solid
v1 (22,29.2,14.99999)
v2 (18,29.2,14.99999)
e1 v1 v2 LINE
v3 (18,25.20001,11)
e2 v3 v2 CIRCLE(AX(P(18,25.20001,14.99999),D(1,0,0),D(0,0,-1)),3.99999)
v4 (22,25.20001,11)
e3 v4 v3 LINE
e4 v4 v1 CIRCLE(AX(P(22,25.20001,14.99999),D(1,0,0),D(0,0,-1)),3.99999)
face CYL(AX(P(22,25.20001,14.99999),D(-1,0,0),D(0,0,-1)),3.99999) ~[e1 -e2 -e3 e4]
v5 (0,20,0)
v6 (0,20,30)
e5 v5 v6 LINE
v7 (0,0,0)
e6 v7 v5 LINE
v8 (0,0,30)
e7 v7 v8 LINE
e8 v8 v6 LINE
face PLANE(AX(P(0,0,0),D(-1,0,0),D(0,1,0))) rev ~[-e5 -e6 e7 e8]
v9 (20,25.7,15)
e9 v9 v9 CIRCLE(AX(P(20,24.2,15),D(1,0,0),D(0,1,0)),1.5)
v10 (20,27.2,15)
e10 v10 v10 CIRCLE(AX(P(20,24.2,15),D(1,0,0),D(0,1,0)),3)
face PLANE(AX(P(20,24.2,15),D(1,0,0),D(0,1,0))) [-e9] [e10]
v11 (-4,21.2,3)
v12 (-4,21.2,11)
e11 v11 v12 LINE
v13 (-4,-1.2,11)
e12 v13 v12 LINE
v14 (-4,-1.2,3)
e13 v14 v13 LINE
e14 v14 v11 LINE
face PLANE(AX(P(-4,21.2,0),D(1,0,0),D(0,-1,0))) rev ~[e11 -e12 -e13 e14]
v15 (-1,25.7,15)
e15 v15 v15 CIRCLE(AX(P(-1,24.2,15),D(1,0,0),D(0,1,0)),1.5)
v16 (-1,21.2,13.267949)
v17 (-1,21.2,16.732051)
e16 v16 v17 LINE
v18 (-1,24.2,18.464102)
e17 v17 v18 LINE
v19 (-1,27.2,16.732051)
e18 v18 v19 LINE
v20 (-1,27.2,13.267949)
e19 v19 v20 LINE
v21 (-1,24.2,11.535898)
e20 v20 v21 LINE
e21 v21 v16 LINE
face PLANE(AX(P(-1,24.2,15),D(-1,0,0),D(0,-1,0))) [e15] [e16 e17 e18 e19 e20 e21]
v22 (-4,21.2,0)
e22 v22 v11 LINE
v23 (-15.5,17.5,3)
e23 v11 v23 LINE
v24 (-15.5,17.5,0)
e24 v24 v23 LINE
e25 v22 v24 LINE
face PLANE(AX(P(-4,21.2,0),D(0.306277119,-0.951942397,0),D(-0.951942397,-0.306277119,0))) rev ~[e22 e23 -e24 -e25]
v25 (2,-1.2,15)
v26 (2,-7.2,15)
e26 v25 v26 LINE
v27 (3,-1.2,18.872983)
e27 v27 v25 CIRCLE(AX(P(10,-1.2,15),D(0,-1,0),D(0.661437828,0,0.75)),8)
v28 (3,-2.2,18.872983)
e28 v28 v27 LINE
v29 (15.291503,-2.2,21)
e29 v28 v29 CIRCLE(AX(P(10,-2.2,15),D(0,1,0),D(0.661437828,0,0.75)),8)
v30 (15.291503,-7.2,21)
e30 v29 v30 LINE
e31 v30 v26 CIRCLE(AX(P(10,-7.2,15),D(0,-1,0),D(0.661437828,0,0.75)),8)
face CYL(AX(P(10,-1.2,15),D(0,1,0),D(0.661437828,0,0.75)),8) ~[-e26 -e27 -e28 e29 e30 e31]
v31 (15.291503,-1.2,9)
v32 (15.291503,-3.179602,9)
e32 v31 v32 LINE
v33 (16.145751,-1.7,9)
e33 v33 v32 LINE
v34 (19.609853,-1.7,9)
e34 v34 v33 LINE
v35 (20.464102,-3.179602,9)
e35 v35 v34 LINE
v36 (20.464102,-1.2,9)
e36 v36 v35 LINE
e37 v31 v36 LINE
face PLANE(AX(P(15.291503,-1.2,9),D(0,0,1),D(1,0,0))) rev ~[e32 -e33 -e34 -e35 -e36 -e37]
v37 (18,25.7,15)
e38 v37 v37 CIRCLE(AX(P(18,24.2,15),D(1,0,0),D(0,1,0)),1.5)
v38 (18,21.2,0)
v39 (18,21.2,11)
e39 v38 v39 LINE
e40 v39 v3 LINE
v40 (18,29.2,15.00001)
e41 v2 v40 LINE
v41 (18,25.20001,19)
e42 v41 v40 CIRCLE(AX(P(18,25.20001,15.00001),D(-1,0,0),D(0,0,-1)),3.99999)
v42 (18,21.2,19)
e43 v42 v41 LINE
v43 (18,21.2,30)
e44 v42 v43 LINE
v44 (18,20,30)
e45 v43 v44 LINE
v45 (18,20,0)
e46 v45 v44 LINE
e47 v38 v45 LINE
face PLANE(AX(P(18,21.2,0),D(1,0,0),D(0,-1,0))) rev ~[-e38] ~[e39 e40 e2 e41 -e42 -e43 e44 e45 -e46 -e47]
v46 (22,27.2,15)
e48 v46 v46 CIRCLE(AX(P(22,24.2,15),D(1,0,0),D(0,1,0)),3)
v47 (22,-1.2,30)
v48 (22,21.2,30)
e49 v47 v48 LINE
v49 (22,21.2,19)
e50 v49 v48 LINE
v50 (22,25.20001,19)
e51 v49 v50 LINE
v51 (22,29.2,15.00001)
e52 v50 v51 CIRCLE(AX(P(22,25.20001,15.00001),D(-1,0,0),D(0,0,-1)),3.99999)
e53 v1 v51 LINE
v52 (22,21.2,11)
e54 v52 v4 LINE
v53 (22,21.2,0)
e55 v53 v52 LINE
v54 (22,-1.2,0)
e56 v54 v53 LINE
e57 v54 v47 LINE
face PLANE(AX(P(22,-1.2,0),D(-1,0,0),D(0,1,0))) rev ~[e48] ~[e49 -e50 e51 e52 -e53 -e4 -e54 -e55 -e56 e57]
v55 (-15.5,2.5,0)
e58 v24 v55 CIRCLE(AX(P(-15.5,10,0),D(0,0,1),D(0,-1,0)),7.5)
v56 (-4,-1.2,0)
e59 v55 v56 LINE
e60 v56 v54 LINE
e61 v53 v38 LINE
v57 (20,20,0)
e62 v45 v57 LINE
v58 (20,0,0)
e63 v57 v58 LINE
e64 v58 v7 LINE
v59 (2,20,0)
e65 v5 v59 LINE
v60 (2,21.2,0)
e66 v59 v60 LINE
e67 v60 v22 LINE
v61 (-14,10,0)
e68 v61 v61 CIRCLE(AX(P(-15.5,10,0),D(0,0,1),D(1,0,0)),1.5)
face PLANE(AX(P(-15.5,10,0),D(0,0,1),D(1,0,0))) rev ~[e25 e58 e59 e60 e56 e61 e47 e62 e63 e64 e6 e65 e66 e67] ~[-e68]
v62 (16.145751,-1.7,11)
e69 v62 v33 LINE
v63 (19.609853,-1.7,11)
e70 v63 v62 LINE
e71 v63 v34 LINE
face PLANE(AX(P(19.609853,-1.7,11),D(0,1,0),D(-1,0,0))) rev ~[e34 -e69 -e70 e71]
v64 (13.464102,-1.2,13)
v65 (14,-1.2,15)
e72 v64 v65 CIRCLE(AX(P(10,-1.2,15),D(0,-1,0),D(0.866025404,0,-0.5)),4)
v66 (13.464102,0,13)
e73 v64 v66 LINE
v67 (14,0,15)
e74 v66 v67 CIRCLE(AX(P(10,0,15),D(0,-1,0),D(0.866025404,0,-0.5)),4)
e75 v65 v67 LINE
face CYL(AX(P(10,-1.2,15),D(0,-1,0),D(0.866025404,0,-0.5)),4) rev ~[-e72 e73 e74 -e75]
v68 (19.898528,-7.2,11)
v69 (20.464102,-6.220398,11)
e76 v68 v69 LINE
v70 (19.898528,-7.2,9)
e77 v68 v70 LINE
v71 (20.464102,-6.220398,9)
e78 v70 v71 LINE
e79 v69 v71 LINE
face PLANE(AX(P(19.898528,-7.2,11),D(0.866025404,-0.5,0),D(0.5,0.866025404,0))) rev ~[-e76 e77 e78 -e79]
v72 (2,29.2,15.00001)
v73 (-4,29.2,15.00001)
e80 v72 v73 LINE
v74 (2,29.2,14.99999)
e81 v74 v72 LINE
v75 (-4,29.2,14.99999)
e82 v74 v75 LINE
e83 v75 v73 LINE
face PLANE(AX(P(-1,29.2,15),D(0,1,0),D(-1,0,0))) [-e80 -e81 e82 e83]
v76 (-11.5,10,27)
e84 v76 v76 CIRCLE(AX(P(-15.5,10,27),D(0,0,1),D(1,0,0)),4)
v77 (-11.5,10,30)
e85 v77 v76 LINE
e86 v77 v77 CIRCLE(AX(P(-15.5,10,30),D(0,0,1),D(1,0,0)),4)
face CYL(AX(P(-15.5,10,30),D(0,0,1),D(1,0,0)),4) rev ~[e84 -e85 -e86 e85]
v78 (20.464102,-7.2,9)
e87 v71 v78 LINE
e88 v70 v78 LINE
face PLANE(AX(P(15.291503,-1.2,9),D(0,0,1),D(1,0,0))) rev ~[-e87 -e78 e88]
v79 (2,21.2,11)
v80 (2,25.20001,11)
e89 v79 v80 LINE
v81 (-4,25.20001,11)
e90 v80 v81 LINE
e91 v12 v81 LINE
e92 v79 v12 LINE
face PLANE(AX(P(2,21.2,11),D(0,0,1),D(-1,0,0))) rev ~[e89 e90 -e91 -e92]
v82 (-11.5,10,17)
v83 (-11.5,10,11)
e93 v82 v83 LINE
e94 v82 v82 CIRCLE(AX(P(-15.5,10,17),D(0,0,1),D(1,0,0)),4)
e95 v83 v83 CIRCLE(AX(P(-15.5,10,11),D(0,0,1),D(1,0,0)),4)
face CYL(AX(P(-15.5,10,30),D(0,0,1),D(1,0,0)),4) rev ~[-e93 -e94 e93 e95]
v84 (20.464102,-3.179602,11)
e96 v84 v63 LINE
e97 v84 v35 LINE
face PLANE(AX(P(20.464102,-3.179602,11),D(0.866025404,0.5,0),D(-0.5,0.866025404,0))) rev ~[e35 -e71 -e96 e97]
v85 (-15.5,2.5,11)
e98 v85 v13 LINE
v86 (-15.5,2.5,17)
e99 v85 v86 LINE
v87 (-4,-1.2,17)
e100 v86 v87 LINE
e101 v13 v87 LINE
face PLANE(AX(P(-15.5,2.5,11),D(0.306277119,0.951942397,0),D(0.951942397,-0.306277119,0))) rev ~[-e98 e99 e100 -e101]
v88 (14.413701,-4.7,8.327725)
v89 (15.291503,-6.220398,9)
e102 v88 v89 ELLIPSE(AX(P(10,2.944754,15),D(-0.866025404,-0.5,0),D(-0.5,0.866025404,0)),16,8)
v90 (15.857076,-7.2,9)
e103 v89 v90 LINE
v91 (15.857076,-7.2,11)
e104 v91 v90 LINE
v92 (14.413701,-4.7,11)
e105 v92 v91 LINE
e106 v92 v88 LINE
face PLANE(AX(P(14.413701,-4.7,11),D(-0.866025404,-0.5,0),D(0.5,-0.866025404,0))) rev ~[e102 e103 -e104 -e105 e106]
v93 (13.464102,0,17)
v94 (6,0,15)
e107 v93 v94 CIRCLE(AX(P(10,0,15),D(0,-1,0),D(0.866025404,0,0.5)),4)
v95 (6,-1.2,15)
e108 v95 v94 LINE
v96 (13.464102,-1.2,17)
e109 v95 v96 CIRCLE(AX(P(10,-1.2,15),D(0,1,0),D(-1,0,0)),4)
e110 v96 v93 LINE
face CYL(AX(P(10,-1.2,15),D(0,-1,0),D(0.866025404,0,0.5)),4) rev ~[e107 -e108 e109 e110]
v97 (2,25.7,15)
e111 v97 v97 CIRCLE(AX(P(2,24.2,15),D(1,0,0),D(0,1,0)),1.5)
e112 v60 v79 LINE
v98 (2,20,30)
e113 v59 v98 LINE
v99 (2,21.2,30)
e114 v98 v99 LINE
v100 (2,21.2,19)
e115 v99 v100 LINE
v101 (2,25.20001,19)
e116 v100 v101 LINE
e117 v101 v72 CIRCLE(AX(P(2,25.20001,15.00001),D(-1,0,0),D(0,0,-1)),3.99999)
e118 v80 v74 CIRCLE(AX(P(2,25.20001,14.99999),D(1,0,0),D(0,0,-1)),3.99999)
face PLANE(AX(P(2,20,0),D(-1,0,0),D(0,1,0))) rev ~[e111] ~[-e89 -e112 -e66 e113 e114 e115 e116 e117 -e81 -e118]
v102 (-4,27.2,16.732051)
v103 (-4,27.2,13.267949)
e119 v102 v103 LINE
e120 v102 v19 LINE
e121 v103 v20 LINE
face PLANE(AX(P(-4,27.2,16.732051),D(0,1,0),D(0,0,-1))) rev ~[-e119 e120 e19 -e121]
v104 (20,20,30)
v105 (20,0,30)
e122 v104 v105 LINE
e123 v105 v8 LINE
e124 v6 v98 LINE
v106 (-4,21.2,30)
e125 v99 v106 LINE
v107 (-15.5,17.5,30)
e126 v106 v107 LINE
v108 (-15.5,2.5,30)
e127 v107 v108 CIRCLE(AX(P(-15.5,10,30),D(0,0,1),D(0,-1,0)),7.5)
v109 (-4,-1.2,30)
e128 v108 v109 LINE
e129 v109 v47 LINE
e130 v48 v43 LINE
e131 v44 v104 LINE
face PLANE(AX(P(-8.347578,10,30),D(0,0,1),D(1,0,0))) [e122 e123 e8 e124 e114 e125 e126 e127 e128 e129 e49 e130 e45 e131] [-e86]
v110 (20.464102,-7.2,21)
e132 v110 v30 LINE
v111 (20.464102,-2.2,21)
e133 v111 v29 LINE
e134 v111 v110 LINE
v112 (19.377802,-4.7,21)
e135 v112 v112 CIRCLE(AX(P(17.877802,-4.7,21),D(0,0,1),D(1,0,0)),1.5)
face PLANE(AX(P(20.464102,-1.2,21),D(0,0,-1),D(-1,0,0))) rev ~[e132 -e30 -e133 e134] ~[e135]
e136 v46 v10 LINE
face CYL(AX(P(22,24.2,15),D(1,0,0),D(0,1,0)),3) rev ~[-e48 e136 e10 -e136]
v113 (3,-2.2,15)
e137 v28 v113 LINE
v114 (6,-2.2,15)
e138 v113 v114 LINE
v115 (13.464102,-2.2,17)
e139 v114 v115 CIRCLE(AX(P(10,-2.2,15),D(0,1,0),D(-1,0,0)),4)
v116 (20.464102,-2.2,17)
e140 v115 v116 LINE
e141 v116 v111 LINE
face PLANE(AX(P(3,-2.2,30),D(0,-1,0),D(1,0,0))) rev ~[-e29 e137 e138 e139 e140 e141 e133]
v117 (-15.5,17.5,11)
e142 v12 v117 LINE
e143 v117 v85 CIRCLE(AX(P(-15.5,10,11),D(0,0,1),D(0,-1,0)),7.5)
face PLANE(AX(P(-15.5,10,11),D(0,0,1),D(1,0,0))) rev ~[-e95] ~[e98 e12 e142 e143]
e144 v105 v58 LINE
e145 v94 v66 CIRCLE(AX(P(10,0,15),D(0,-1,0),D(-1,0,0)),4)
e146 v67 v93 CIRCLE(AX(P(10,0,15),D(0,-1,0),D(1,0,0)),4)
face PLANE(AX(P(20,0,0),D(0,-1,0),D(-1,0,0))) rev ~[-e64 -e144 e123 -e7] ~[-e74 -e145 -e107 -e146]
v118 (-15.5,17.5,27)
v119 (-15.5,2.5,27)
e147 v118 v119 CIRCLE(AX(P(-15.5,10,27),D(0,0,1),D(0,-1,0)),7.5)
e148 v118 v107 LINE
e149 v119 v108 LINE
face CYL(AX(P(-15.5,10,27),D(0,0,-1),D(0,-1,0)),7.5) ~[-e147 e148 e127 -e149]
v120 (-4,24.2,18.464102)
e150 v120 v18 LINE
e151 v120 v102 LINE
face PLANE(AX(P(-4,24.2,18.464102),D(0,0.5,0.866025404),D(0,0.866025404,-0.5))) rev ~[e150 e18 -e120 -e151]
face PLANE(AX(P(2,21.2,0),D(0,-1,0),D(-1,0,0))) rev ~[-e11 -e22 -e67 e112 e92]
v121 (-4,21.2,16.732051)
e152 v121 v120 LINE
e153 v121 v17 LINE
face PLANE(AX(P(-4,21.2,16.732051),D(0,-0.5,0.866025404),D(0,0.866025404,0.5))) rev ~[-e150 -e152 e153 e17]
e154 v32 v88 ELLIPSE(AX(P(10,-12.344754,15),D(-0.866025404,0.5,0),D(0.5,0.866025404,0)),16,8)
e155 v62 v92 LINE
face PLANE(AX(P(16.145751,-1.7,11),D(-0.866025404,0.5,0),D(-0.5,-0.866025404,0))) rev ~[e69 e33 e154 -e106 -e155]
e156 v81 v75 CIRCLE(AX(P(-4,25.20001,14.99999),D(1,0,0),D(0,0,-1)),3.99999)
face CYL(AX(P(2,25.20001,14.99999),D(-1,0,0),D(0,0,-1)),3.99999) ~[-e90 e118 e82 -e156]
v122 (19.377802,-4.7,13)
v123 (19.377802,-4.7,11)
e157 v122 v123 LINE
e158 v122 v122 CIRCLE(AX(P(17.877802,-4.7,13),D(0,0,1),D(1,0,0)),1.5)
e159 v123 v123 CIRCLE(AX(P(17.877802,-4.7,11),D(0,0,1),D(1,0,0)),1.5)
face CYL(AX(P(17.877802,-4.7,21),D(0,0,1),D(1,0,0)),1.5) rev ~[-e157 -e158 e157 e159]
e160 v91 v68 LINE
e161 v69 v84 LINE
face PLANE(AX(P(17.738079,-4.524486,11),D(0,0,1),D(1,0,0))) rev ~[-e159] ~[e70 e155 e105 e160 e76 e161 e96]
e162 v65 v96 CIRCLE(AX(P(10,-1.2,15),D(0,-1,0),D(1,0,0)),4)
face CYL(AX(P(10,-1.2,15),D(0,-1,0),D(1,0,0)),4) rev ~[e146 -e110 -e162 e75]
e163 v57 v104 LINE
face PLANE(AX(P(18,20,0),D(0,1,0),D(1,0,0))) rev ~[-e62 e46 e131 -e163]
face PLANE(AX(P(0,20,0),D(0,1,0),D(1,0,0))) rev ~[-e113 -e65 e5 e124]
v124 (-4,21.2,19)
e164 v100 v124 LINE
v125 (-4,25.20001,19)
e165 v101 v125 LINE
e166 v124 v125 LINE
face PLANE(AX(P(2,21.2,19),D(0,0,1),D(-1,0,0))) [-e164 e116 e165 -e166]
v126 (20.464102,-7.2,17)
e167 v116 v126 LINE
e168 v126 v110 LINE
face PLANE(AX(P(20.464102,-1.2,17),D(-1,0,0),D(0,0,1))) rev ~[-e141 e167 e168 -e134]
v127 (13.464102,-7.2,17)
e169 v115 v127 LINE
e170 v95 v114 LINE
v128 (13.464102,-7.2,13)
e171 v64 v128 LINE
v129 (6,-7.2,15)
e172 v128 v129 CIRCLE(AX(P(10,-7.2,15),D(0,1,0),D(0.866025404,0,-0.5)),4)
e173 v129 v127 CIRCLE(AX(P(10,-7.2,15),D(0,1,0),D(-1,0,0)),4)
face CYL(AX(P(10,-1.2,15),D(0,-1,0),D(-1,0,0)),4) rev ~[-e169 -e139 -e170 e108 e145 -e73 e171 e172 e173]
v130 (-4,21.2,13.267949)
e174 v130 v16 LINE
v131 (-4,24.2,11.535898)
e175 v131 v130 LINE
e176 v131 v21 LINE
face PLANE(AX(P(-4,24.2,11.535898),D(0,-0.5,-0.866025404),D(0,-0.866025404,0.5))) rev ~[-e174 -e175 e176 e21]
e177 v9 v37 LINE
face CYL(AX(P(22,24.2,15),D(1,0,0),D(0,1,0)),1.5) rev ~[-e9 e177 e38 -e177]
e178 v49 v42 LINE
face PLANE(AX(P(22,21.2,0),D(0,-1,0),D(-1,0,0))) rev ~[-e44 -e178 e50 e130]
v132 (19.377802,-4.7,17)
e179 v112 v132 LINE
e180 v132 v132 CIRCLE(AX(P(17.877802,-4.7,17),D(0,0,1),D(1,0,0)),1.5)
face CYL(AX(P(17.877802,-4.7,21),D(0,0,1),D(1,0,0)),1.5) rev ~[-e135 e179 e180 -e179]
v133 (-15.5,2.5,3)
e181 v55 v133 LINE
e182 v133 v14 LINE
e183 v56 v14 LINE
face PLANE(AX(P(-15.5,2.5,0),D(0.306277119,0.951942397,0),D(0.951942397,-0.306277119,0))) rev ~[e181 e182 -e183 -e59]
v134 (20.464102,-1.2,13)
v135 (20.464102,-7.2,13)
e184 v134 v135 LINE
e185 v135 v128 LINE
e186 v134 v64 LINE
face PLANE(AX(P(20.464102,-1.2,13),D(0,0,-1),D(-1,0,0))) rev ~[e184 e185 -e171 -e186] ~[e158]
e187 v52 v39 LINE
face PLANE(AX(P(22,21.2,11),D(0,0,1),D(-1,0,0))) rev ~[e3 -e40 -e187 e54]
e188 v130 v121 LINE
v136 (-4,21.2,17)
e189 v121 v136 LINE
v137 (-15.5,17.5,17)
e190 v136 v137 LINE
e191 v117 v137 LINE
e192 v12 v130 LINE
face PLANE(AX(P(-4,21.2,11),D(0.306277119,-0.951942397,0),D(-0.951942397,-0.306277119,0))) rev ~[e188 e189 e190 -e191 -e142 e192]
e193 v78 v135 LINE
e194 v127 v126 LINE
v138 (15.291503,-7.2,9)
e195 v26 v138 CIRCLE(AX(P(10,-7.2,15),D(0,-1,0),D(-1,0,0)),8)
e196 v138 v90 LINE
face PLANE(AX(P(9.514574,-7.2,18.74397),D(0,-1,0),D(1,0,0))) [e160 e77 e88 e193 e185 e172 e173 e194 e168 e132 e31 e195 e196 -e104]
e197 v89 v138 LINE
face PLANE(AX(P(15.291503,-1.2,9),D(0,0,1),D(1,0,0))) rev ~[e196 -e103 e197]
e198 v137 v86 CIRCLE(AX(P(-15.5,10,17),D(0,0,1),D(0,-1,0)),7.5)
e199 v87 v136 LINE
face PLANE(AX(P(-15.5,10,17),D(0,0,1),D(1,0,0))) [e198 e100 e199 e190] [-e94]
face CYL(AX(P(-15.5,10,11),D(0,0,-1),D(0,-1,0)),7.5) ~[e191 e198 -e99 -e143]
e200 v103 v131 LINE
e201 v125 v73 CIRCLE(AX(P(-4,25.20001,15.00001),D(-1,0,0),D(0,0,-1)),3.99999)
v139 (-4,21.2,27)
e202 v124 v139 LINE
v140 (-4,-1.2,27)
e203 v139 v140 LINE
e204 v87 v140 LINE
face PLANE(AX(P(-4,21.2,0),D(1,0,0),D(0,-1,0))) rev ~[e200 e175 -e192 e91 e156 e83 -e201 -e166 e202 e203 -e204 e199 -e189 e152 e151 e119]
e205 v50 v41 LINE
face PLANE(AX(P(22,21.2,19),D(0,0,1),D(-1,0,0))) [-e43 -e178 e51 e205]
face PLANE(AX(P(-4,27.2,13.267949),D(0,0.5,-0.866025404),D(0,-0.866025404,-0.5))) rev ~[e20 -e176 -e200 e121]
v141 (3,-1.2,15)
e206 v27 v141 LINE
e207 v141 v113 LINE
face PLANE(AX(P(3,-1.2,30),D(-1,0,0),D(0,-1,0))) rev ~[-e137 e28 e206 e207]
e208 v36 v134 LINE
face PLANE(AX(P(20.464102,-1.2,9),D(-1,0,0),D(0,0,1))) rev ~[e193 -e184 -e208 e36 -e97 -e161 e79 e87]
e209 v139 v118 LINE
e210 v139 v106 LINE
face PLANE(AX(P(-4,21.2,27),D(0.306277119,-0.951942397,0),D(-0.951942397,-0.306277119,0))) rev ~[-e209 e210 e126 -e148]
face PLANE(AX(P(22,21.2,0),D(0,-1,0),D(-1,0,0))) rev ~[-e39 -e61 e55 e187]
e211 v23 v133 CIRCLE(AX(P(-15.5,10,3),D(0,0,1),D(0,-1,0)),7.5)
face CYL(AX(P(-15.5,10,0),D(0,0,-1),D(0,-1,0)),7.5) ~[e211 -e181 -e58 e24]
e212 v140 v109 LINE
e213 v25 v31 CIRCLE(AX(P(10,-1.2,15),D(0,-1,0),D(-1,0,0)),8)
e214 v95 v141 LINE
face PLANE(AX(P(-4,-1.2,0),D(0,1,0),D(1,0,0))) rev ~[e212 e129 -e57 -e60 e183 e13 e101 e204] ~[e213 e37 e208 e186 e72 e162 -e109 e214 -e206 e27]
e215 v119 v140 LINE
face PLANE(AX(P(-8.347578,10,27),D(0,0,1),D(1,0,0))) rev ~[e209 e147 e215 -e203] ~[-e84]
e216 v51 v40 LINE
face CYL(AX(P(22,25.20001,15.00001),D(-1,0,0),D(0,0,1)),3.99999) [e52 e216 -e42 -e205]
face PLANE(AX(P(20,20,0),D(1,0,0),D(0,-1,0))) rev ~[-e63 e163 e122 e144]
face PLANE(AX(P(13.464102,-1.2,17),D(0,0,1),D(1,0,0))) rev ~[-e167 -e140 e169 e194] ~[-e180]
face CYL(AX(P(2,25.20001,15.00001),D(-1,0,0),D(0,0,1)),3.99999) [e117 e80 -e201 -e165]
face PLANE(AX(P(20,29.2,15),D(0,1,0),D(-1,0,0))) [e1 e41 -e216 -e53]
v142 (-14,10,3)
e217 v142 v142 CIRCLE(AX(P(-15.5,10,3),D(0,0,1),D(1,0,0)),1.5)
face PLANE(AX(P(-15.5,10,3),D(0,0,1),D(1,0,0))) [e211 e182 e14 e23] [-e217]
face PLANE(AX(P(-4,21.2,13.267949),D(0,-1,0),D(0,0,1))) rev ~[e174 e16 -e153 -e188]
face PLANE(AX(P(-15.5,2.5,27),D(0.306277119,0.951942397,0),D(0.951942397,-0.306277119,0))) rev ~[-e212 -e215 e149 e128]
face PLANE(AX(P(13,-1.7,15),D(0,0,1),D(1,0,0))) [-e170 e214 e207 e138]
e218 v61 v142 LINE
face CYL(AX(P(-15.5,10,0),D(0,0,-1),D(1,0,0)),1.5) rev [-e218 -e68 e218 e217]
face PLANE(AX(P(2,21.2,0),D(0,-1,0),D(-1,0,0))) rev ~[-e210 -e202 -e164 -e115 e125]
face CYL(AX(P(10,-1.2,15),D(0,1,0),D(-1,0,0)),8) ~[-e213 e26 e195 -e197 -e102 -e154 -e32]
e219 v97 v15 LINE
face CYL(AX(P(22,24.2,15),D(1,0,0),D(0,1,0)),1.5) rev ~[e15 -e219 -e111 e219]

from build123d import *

# Parameters (mm, degrees)
F1_DEPTH  = 30
F3_DEPTH  = 6
F4_DEPTH  = 25
F6_DEPTH  = 15
F7_R      = 1.5
F8_DEPTH  = 25
F9_W      = 4
F9_H      = 8
F9_W_2    = 6
F10_DEPTH = 8
F11_R     = 3.99999
F12_R     = 1.5
F13_DEPTH = 25
F14_START = 27
F0_R      = 1.5
F14_DEPTH = 3
F15_START = 11
F15_DEPTH = 6
F16_DEPTH = 3
F17_R     = 4
F17_R_2   = 1.5
F18_DEPTH = 27
F12_R_2   = 3
F19_DEPTH = 2
F21_DEPTH = 3
F23_START = -2
F22_R     = 1.5
F23_DEPTH = 8


# Not quite as in the source:
# - a fillet or chamfer is up to 0.001 mm smaller than in the source, because OpenCascade refuses the exact size
# - a feature names something its author has since deleted; it is built from what else it names


with BuildPart() as f1:
    # F0 (on Top) → F1 (new body)
    with BuildSketch(Plane.XY):
        Polygon((20, 0), (0, 0), (0, 20), (2, 20), (2, 21.2), (-4, 21.2), (-4, -1.2), (22, -1.2), (22, 21.2), (18, 21.2), (18, 20), (20, 20), align=None)
    extrude(amount=F1_DEPTH)

    # F2 (on face) → F3 (join)
    with BuildSketch(Plane.XZ.offset(1.2)):
        with BuildLine():
            ThreePointArc((6, 15), (8.9647238196, 18.8637033052), (13.4641016151, 17))
            Line((13.4641016151, 17), (17.7459666924, 17))
            ThreePointArc((17.7459666924, 17), (16.8186436725, 19.1840289755), (15.2915026221, 21))
            ThreePointArc((15.2915026221, 21), (6.7084973779, 22.2915026221), (2, 15))
            Line((2, 15), (6, 15))
        make_face()
        with BuildLine():
            ThreePointArc((15.2915026221, 21), (16.8186436725, 19.1840289755), (17.7459666924, 17))
            Line((17.7459666924, 17), (20.4641016151, 17))
            Line((20.4641016151, 17), (20.4641016151, 21))
            Line((20.4641016151, 21), (15.2915026221, 21))
        make_face()
        with BuildLine():
            Line((20.4641016151, 13), (17.7459666924, 13))
            ThreePointArc((17.7459666924, 13), (16.8186436725, 10.8159710245), (15.2915026221, 9))
            Line((15.2915026221, 9), (20.4641016151, 9))
            Line((20.4641016151, 9), (20.4641016151, 13))
        make_face()
        with BuildLine():
            Line((17.7459666924, 13), (13.4641016151, 13))
            ThreePointArc((13.4641016151, 13), (8.9647238196, 11.1362966948), (6, 15))
            Line((6, 15), (2, 15))
            ThreePointArc((2, 15), (6.7084973779, 7.7084973779), (15.2915026221, 9))
            ThreePointArc((15.2915026221, 9), (16.8186436725, 10.8159710245), (17.7459666924, 13))
        make_face()
    extrude(amount=F3_DEPTH)

    # F2 (on face) → F4 (cut)
    with BuildSketch(Plane.XZ.offset(1.2)):
        with BuildLine():
            ThreePointArc((13.4641016151, 13), (13.8637033052, 13.9647238196), (14, 15))
            ThreePointArc((14, 15), (13.8637033052, 16.0352761804), (13.4641016151, 17))
            ThreePointArc((13.4641016151, 17), (8.9647238196, 18.8637033052), (6, 15))
            ThreePointArc((6, 15), (8.9647238196, 11.1362966948), (13.4641016151, 13))
        make_face()
    extrude(amount=-F4_DEPTH, mode=Mode.SUBTRACT)

    # F5 (on face) → F6 (cut)
    with BuildSketch(Plane.XY.offset(30)):
        Polygon((22, -1.2), (3, -1.2), (3, -2.2), (23, -2.2), (23, -1.2), align=None)
    extrude(amount=-F6_DEPTH, mode=Mode.SUBTRACT)

    # F7 (on face) → F8 (cut)
    with BuildSketch(Plane.XY.offset(21)):
        with Locations((17.8778021186, -4.7)):
            Circle(F7_R)
    extrude(amount=-F8_DEPTH, mode=Mode.SUBTRACT)

    # F9 (on face) → F10 (join)
    with BuildSketch(Plane(origin=(0, 21.2, 0), x_dir=(-1, 0, 0), z_dir=(0, 1, 0))):
        with Locations((-20, 15)):
            Rectangle(F9_W, F9_H)
        with Locations((1, 15)):
            Rectangle(F9_W_2, F9_H)
    extrude(amount=F10_DEPTH)

    # F11 (radius 4 in the source; OpenCascade refuses exactly that, so slightly less here)
    f11_edges = [f1.edges().sort_by_distance(p)[0] for p in [
        (20, 29.2, 19),
        (20, 29.2, 11),
        (-1, 29.2, 19),
        (-1, 29.2, 11),
    ]]
    fillet(f11_edges, radius=F11_R)

    # F12 (on face) → F13 (cut)
    with BuildSketch(Plane.YZ.offset(22)):
        with Locations((24.2, 15)):
            Circle(F12_R)
    extrude(amount=-F13_DEPTH, mode=Mode.SUBTRACT)

    # F0 (on Top) → F14 (join)
    with BuildSketch(Plane.XY.offset(F14_START)):
        with BuildLine():
            Line((-4, -1.2), (-4, 21.2))
            Line((-4, 21.2), (-15.5, 17.5))
            ThreePointArc((-15.5, 17.5), (-10.1966991411, 15.3033008589), (-8, 10))
            ThreePointArc((-8, 10), (-10.1966991411, 4.6966991411), (-15.5, 2.5))
            Line((-15.5, 2.5), (-4, -1.2))
        make_face()
        with BuildLine():
            ThreePointArc((-8, 10), (-10.1966991411, 15.3033008589), (-15.5, 17.5))
            ThreePointArc((-15.5, 17.5), (-23, 10), (-15.5, 2.5))
            ThreePointArc((-15.5, 2.5), (-10.1966991411, 4.6966991411), (-8, 10))
        make_face()
        with Locations((-15.5, 10)):
            Circle(F0_R, mode=Mode.SUBTRACT)
        Polygon((20, 0), (0, 0), (0, 20), (2, 20), (2, 21.2), (-4, 21.2), (-4, -1.2), (22, -1.2), (22, 21.2), (18, 21.2), (18, 20), (20, 20), align=None)
    extrude(amount=F14_DEPTH)

    # F0 (on Top) → F15 (join)
    with BuildSketch(Plane.XY.offset(F15_START)):
        with BuildLine():
            ThreePointArc((-8, 10), (-10.1966991411, 15.3033008589), (-15.5, 17.5))
            ThreePointArc((-15.5, 17.5), (-23, 10), (-15.5, 2.5))
            ThreePointArc((-15.5, 2.5), (-10.1966991411, 4.6966991411), (-8, 10))
        make_face()
        with Locations((-15.5, 10)):
            Circle(F0_R, mode=Mode.SUBTRACT)
        with BuildLine():
            Line((-4, -1.2), (-4, 21.2))
            Line((-4, 21.2), (-15.5, 17.5))
            ThreePointArc((-15.5, 17.5), (-10.1966991411, 15.3033008589), (-8, 10))
            ThreePointArc((-8, 10), (-10.1966991411, 4.6966991411), (-15.5, 2.5))
            Line((-15.5, 2.5), (-4, -1.2))
        make_face()
    extrude(amount=F15_DEPTH)

    # F0 (on Top) → F16 (join)
    with BuildSketch(Plane.XY):
        with BuildLine():
            ThreePointArc((-8, 10), (-10.1966991411, 15.3033008589), (-15.5, 17.5))
            ThreePointArc((-15.5, 17.5), (-23, 10), (-15.5, 2.5))
            ThreePointArc((-15.5, 2.5), (-10.1966991411, 4.6966991411), (-8, 10))
        make_face()
        with Locations((-15.5, 10)):
            Circle(F0_R, mode=Mode.SUBTRACT)
        with BuildLine():
            Line((-4, -1.2), (-4, 21.2))
            Line((-4, 21.2), (-15.5, 17.5))
            ThreePointArc((-15.5, 17.5), (-10.1966991411, 15.3033008589), (-8, 10))
            ThreePointArc((-8, 10), (-10.1966991411, 4.6966991411), (-15.5, 2.5))
            Line((-15.5, 2.5), (-4, -1.2))
        make_face()
    extrude(amount=F16_DEPTH)

    # F17 (on face) → F18 (cut)
    with BuildSketch(Plane.XY.offset(30)):
        with Locations((-15.5, 10)):
            Circle(F17_R)
        with Locations((-15.5, 10)):
            Circle(F17_R_2, mode=Mode.SUBTRACT)
    extrude(amount=-F18_DEPTH, mode=Mode.SUBTRACT)

    # F12 (on face) → F19 (cut)
    with BuildSketch(Plane.YZ.offset(22)):
        with Locations((24.2, 15)):
            Circle(F12_R_2)
        with Locations((24.2, 15)):
            Circle(F12_R, mode=Mode.SUBTRACT)
    extrude(amount=-F19_DEPTH, mode=Mode.SUBTRACT)

    # F20 (on face) → F21 (cut)
    with BuildSketch(Plane(origin=(-4, 0, 0), x_dir=(0, -1, 0), z_dir=(-1, 0, 0))):
        Polygon((-21.2, 13.2679491924), (-21.2, 16.7320508076), (-24.2, 18.4641016151), (-27.2, 16.7320508076), (-27.2, 13.2679491924), (-24.2, 11.5358983849), align=None)
    extrude(amount=-F21_DEPTH, mode=Mode.SUBTRACT)

    # F22 (on face) → F23 (cut)
    with BuildSketch(Plane.XY.offset(13).offset(F23_START)):
        Polygon((19.6098529262, -1.7), (16.1457513111, -1.7), (14.4137005035, -4.7), (15.8570761765, -7.2), (19.8985280608, -7.2), (20.4641016151, -6.2203978685), (20.4641016151, -3.1796021315), align=None)
        with Locations((17.8778021186, -4.7)):
            Circle(F22_R, mode=Mode.SUBTRACT)
    extrude(amount=-F23_DEPTH, mode=Mode.SUBTRACT)


solid = f1.part
